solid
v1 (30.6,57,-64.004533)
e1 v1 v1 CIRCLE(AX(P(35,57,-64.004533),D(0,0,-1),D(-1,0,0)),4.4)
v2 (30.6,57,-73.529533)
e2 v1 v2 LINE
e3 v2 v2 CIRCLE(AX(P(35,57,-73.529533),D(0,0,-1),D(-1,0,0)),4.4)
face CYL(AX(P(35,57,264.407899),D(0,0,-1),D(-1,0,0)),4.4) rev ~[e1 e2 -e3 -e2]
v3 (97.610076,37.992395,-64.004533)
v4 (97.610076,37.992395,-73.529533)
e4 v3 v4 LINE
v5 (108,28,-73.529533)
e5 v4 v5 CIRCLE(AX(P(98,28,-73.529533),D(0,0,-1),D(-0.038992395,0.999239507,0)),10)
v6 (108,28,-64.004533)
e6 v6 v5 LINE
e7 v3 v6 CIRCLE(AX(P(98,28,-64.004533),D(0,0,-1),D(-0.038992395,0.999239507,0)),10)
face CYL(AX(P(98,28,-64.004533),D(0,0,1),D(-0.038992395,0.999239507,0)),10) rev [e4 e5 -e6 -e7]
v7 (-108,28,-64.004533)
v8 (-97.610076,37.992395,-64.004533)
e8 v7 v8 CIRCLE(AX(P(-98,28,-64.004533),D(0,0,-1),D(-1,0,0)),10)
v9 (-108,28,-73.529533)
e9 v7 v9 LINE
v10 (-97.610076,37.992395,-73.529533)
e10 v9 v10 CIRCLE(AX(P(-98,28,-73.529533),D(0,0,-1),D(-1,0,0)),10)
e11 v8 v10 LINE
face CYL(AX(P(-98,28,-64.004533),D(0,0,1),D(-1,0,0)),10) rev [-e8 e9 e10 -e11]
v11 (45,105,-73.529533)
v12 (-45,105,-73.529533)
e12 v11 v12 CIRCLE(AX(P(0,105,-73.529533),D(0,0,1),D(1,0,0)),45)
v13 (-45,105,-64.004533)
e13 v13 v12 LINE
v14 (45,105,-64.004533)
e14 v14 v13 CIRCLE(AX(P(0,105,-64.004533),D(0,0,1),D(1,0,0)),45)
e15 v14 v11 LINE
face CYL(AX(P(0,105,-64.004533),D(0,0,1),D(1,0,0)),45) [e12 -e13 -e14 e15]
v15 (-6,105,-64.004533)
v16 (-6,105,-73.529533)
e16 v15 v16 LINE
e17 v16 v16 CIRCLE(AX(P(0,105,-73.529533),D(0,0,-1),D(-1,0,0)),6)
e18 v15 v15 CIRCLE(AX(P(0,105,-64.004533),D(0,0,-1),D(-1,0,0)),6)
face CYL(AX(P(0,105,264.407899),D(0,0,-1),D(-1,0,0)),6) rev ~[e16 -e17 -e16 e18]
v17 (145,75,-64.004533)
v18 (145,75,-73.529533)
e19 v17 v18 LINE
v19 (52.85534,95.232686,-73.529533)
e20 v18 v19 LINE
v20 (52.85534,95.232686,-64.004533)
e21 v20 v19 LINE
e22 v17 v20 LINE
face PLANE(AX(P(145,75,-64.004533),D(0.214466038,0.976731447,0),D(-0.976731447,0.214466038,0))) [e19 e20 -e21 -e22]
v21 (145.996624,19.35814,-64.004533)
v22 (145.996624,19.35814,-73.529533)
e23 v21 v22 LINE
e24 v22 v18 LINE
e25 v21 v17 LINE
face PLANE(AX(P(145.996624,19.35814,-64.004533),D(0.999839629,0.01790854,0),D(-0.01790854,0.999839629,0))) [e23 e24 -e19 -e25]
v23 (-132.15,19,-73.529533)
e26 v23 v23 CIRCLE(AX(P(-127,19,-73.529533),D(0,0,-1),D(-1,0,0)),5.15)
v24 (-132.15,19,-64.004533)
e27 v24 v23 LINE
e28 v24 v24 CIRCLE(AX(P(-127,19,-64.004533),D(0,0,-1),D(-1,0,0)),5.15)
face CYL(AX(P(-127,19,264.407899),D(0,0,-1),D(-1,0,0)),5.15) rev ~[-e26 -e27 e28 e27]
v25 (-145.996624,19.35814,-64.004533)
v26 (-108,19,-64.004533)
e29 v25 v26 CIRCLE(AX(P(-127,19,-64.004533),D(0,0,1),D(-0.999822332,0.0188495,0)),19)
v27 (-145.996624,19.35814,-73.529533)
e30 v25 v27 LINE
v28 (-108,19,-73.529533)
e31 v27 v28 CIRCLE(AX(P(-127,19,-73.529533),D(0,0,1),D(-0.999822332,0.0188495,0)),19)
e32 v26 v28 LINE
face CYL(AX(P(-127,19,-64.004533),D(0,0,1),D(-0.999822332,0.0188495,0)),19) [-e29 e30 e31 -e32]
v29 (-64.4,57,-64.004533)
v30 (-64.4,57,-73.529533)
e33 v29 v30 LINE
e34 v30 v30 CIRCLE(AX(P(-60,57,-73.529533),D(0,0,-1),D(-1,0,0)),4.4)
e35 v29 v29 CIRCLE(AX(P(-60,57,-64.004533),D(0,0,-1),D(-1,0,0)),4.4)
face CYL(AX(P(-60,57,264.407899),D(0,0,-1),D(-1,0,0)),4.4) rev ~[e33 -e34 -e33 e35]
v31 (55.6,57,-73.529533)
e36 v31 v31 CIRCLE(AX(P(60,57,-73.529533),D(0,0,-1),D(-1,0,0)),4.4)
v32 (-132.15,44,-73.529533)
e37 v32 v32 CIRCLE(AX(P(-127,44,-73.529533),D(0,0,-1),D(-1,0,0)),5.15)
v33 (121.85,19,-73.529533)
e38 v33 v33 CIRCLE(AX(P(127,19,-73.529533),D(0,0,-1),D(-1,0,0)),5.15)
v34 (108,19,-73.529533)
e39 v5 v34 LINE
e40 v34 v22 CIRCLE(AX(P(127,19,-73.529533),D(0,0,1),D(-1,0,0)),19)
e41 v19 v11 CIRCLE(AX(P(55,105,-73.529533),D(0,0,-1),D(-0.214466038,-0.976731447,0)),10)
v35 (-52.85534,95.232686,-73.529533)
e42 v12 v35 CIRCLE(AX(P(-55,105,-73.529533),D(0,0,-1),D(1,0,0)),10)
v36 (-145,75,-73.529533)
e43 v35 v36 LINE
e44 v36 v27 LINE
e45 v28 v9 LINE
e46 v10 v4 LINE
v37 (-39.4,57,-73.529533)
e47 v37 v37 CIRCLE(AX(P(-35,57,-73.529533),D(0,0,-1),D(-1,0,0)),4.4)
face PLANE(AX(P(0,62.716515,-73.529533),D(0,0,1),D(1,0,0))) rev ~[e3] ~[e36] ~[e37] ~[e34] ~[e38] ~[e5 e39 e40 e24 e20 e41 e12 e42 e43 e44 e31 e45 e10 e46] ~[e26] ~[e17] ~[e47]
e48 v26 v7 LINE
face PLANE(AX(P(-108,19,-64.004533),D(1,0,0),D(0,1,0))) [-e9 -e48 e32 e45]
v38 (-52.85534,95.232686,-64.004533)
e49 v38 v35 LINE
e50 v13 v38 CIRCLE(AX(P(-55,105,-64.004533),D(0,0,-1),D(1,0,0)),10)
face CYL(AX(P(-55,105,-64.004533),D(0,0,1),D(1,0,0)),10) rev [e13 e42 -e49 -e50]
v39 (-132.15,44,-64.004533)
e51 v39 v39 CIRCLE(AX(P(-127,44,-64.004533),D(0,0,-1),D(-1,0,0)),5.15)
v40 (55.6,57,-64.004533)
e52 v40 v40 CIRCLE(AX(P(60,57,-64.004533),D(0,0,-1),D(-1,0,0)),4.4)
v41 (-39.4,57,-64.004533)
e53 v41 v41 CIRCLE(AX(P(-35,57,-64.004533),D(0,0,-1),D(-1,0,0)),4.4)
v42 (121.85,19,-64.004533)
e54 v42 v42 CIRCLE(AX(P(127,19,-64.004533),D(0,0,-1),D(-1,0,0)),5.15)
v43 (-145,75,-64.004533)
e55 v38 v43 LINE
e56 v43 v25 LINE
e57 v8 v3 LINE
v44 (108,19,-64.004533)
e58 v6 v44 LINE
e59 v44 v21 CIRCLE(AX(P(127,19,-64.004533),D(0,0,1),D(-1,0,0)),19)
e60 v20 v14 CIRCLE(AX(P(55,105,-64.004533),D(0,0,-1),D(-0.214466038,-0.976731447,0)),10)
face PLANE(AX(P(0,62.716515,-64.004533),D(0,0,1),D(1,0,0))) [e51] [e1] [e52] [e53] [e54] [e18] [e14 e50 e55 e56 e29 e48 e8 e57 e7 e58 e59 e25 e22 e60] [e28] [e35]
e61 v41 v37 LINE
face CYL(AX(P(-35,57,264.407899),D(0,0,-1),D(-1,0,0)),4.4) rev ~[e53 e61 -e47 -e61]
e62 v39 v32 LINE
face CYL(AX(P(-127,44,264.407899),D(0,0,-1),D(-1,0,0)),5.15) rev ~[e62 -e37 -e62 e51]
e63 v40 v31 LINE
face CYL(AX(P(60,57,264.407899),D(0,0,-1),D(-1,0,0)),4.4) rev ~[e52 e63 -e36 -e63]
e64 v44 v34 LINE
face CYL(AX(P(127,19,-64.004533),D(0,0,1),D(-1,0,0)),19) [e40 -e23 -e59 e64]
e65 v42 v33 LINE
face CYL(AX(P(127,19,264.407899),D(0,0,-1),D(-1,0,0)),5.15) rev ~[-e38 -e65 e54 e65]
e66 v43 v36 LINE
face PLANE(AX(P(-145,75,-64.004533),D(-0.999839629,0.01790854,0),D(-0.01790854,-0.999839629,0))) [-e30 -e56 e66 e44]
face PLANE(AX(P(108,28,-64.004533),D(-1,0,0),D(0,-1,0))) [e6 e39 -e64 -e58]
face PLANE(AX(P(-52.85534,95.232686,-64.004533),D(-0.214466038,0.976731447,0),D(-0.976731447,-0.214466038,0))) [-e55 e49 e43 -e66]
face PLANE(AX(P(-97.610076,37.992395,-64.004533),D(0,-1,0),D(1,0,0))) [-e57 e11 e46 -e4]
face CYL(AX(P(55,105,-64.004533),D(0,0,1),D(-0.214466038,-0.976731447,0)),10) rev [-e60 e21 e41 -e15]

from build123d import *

# Parameters (mm, degrees)
F1_DEPTH = 9.525
F2_D     = 10.3
F3_D     = 8.8
F4_D     = 12
F5_ANGLE = 90


# Not quite as in the source:
# - a length typed as a fraction of an inch, garbled in the dataset ("3 / 203.2 mm" for 3/8 in), is restored
# - a feature names something its author has since deleted; it is built from what else it names


with BuildPart() as f1:
    # F0 (on Front) → F1 (new body)
    with BuildSketch(Plane.XZ):
        with BuildLine():
            ThreePointArc((-108, -36.0045329175), (-104.9318381582, -28.796924455), (-97.6100760503, -26.0121378435))
            Line((-97.6100760503, -26.0121378435), (0, -26.0121378435))
            Line((0, -26.0121378435), (97.6100760503, -26.0121378435))
            ThreePointArc((97.6100760503, -26.0121378435), (104.9318381582, -28.796924455), (108, -36.0045329175))
            Line((108, -36.0045329175), (108, -45.0045329175))
            ThreePointArc((108, -45.0045329175), (127.1790782013, -64.0036889776), (145.9966243156, -44.6463924235))
            Line((145.9966243156, -44.6463924235), (145, 10.9954670825))
            Line((145, 10.9954670825), (52.8553396226, 31.2281526171))
            ThreePointArc((52.8553396226, 31.2281526171), (47.2074842389, 34.7283546603), (45, 40.9954670825))
            ThreePointArc((45, 40.9954670825), (31.8198051534, 72.8152722359), (0, 85.9954670825))
            ThreePointArc((0, 85.9954670825), (-31.8198051534, 72.8152722359), (-45, 40.9954670825))
            ThreePointArc((-45, 40.9954670825), (-47.2074842389, 34.7283546603), (-52.8553396226, 31.2281526171))
            Line((-52.8553396226, 31.2281526171), (-145, 10.9954670825))
            Line((-145, 10.9954670825), (-145.9966243156, -44.6463924235))
            ThreePointArc((-145.9966243156, -44.6463924235), (-127.1790782013, -64.0036889776), (-108, -45.0045329175))
            Line((-108, -45.0045329175), (-108, -36.0045329175))
        make_face()
    extrude(amount=-F1_DEPTH)

    # F2 (through all)
    with Locations(Plane.XZ):
        with Locations((-127, -45.0045329175), (-127, -20.0045329175), (127, -45.0045329175)):
            Hole(F2_D / 2)

    # F3 (through all)
    with Locations(Plane.XZ):
        with Locations((-60, -7.0045329175), (-35, -7.0045329175), (35, -7.0045329175), (60, -7.0045329175)):
            Hole(F3_D / 2)

    # F4 (through all)
    with Locations(Plane.XZ):
        with Locations((0, 40.9954670825)):
            Hole(F4_D / 2)


with BuildPart() as f1_1:
    # F5: moved
    add(f1.part.rotate(Axis((-53.975, 0, -64.0045329175), (-1, 0, 0)), F5_ANGLE))


solid = f1_1.part
